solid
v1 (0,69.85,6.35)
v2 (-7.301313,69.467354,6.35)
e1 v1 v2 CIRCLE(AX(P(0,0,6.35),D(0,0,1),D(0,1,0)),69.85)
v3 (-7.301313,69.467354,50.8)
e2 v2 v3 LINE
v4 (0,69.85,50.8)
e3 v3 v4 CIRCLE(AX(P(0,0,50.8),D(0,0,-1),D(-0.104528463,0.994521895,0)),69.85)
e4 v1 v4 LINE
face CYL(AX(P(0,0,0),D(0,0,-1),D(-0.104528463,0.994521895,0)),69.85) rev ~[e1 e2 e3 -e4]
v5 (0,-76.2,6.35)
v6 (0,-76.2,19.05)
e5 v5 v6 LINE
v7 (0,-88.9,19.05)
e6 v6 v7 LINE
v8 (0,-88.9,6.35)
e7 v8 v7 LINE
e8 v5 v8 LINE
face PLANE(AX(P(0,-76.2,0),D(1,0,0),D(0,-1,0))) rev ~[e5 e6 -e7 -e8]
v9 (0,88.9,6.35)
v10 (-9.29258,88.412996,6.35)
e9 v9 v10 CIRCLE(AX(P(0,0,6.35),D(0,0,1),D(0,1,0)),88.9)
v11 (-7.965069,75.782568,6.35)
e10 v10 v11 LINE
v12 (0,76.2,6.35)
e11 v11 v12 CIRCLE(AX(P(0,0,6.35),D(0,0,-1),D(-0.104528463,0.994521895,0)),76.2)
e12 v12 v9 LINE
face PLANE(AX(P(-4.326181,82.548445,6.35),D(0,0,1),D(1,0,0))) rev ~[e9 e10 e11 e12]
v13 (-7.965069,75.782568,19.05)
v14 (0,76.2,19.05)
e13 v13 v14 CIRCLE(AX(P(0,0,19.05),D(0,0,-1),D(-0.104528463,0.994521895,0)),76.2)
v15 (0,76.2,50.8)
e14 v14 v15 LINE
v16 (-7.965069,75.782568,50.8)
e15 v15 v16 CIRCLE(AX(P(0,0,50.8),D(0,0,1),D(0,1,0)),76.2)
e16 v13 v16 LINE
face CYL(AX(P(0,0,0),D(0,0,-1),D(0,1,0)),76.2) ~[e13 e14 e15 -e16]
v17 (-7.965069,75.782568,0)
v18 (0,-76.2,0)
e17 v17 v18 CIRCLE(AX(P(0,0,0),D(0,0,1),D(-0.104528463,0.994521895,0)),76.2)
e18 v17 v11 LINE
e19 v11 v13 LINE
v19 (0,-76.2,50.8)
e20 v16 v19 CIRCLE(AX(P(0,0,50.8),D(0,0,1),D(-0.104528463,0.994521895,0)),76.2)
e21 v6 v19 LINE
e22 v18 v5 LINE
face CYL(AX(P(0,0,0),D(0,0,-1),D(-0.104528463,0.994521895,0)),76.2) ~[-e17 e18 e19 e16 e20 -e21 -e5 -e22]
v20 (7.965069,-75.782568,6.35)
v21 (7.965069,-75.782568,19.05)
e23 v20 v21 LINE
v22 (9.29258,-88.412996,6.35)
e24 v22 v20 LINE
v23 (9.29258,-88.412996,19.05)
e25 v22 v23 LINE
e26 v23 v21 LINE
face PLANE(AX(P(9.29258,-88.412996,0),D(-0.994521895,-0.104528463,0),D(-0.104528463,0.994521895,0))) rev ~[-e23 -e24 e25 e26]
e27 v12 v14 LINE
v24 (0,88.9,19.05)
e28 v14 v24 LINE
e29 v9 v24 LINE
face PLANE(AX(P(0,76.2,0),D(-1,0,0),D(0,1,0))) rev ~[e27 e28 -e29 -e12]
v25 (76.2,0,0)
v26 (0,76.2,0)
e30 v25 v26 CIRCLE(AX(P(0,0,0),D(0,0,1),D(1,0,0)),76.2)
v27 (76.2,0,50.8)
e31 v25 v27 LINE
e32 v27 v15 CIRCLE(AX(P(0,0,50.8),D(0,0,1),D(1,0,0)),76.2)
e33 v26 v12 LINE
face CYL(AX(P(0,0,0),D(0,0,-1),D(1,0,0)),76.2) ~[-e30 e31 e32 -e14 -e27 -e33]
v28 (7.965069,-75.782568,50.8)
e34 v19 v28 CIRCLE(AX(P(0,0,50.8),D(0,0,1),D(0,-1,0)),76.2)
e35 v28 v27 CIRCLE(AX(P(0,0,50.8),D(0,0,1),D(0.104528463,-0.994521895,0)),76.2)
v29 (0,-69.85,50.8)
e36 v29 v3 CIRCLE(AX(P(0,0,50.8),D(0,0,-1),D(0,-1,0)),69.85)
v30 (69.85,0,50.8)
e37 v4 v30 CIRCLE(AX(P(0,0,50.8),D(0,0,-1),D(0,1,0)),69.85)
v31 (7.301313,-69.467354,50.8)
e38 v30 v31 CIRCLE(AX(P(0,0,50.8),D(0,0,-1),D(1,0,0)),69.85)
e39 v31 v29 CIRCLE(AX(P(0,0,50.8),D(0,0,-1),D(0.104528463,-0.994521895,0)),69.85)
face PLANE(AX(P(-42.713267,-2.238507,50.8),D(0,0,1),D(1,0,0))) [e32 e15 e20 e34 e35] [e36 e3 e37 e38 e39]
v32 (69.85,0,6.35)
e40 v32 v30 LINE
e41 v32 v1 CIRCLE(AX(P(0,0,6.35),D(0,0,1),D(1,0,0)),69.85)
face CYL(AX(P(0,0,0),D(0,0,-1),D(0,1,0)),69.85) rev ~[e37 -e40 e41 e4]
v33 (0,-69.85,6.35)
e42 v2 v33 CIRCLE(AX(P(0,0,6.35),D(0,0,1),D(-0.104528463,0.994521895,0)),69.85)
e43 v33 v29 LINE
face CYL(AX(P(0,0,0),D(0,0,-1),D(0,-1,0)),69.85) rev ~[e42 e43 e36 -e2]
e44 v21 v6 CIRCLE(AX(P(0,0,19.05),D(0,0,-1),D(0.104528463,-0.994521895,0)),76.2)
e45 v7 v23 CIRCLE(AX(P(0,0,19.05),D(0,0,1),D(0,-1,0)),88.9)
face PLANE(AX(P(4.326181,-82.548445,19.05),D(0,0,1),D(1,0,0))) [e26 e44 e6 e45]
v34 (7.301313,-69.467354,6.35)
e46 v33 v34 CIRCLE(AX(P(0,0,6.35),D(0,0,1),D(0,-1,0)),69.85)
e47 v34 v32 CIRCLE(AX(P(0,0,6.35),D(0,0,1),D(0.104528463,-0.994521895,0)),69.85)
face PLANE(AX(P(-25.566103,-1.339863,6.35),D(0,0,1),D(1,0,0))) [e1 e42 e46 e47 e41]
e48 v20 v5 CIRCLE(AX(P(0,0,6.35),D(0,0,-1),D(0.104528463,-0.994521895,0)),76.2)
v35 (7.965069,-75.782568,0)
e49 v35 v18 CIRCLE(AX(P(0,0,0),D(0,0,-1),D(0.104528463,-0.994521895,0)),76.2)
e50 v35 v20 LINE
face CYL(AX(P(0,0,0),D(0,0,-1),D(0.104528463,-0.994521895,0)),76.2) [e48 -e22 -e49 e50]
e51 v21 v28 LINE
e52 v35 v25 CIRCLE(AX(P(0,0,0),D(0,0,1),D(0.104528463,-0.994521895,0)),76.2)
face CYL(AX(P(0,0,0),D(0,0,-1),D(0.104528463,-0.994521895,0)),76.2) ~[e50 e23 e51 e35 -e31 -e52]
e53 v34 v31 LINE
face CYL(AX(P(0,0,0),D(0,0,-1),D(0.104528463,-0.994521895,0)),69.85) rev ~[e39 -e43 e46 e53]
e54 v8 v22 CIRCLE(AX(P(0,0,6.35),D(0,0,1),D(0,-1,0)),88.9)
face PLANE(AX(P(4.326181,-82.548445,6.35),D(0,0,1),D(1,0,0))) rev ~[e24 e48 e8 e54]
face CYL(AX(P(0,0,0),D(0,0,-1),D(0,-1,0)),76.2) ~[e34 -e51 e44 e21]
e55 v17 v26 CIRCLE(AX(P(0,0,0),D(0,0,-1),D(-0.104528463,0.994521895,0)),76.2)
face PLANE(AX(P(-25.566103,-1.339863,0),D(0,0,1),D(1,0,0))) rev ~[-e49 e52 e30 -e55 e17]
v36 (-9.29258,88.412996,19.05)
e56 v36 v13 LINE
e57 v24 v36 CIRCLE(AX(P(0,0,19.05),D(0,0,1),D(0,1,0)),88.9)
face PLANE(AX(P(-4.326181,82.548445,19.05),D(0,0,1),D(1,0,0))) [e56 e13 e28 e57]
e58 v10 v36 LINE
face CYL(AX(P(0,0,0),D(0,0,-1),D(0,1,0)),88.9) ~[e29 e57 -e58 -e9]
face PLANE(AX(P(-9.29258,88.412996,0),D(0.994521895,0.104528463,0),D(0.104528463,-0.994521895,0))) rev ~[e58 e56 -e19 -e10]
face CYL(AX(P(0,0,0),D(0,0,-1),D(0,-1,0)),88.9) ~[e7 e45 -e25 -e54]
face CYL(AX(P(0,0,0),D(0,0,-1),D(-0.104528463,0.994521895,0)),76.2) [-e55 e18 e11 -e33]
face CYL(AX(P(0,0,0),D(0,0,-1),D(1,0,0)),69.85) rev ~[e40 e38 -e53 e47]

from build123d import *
from build123d import SkipClean  # not in build123d's __all__

# Parameters (mm, degrees)
F1_DEPTH = 50.8
F2_DEPTH = 19.05
F3_DEPTH = 6.35
F4_DEPTH = 6.35


# Not quite as in the source:
# - after a boolean that leaves OpenCascade's solid faulty, fix() repairs it


with BuildPart() as f1:
    # F0 (on Top) → F1 (new body)
    with BuildSketch(Plane.XY):
        with BuildLine():
            Line((-7.3013131592, 69.4673543915), (-7.965068901, 75.7825684271))
            ThreePointArc((-7.965068901, 75.7825684271), (-76.0955705483, -3.9879998657), (0, -76.2))
            Line((0, -76.2), (0, -69.85))
            ThreePointArc((0, -69.85), (-69.7542730026, -3.6556665436), (-7.3013131592, 69.4673543915))
        make_face()
        with BuildLine():
            Line((0, 69.85), (0, 76.2))
            ThreePointArc((0, 76.2), (-3.9879998657, 76.0955705483), (-7.965068901, 75.7825684271))
            Line((-7.965068901, 75.7825684271), (-7.3013131592, 69.4673543915))
            ThreePointArc((-7.3013131592, 69.4673543915), (-3.6556665436, 69.7542730026), (0, 69.85))
        make_face()
        with BuildLine():
            ThreePointArc((0, -76.2), (3.9879998657, -76.0955705483), (7.965068901, -75.7825684271))
            Line((7.965068901, -75.7825684271), (7.3013131592, -69.4673543915))
            ThreePointArc((7.3013131592, -69.4673543915), (3.6556665436, -69.7542730026), (0, -69.85))
            Line((0, -69.85), (0, -76.2))
        make_face()
        with BuildLine():
            ThreePointArc((7.965068901, -75.7825684271), (56.6276357014, -50.9877522045), (76.2, 0))
            ThreePointArc((76.2, 0), (53.8815367264, 53.8815367264), (0, 76.2))
            Line((0, 76.2), (0, 69.85))
            ThreePointArc((0, 69.85), (49.3914086659, 49.3914086659), (69.85, 0))
            ThreePointArc((69.85, 0), (51.9086660596, -46.7387728542), (7.3013131592, -69.4673543915))
            Line((7.3013131592, -69.4673543915), (7.965068901, -75.7825684271))
        make_face()
    extrude(amount=F1_DEPTH)

    # F0 (on Top) → F2 (join)
    with BuildSketch(Plane.XY):
        with BuildLine():
            ThreePointArc((-7.965068901, 75.7825684271), (-3.9879998657, 76.0955705483), (0, 76.2))
            Line((0, 76.2), (0, 88.9))
            ThreePointArc((0, 88.9), (-4.65266651, 88.7781656397), (-9.2925803845, 88.4129964982))
            Line((-9.2925803845, 88.4129964982), (-7.965068901, 75.7825684271))
        make_face()
        with BuildLine():
            Line((9.2925803845, -88.4129964982), (7.965068901, -75.7825684271))
            ThreePointArc((7.965068901, -75.7825684271), (3.9879998657, -76.0955705483), (0, -76.2))
            Line((0, -76.2), (0, -88.9))
            ThreePointArc((0, -88.9), (4.65266651, -88.7781656397), (9.2925803845, -88.4129964982))
        make_face()
    extrude(amount=F2_DEPTH)

    # F0 (on Top) → F3 (cut)
    with BuildSketch(Plane.XY):
        with BuildLine():
            Line((9.2925803845, -88.4129964982), (7.965068901, -75.7825684271))
            ThreePointArc((7.965068901, -75.7825684271), (3.9879998657, -76.0955705483), (0, -76.2))
            Line((0, -76.2), (0, -88.9))
            ThreePointArc((0, -88.9), (4.65266651, -88.7781656397), (9.2925803845, -88.4129964982))
        make_face()
        with BuildLine():
            ThreePointArc((-7.965068901, 75.7825684271), (-3.9879998657, 76.0955705483), (0, 76.2))
            Line((0, 76.2), (0, 88.9))
            ThreePointArc((0, 88.9), (-4.65266651, 88.7781656397), (-9.2925803845, 88.4129964982))
            Line((-9.2925803845, 88.4129964982), (-7.965068901, 75.7825684271))
        make_face()
    with SkipClean():  # cleaning this boolean's faces spoils the solid; the shape is the same uncleaned
        extrude(amount=F3_DEPTH, mode=Mode.SUBTRACT)

    # F0 (on Top) → F4 (join)
    with BuildSketch(Plane.XY):
        with BuildLine():
            Line((0, 0), (-7.3013131592, 69.4673543915))
            ThreePointArc((-7.3013131592, 69.4673543915), (-69.7542730026, -3.6556665436), (0, -69.85))
            Line((0, -69.85), (0, 0))
        make_face()
        with BuildLine():
            Line((0, 0), (0, 69.85))
            ThreePointArc((0, 69.85), (-3.6556665436, 69.7542730026), (-7.3013131592, 69.4673543915))
            Line((-7.3013131592, 69.4673543915), (0, 0))
        make_face()
        with BuildLine():
            ThreePointArc((69.85, 0), (49.3914086659, 49.3914086659), (0, 69.85))
            Line((0, 69.85), (0, 0))
            Line((0, 0), (7.3013131592, -69.4673543915))
            ThreePointArc((7.3013131592, -69.4673543915), (51.9086660596, -46.7387728542), (69.85, 0))
        make_face()
        with BuildLine():
            ThreePointArc((0, -69.85), (3.6556665436, -69.7542730026), (7.3013131592, -69.4673543915))
            Line((7.3013131592, -69.4673543915), (0, 0))
            Line((0, 0), (0, -69.85))
        make_face()
    extrude(amount=F4_DEPTH)

    add(f1.part.fix(), mode=Mode.REPLACE)


solid = f1.part
